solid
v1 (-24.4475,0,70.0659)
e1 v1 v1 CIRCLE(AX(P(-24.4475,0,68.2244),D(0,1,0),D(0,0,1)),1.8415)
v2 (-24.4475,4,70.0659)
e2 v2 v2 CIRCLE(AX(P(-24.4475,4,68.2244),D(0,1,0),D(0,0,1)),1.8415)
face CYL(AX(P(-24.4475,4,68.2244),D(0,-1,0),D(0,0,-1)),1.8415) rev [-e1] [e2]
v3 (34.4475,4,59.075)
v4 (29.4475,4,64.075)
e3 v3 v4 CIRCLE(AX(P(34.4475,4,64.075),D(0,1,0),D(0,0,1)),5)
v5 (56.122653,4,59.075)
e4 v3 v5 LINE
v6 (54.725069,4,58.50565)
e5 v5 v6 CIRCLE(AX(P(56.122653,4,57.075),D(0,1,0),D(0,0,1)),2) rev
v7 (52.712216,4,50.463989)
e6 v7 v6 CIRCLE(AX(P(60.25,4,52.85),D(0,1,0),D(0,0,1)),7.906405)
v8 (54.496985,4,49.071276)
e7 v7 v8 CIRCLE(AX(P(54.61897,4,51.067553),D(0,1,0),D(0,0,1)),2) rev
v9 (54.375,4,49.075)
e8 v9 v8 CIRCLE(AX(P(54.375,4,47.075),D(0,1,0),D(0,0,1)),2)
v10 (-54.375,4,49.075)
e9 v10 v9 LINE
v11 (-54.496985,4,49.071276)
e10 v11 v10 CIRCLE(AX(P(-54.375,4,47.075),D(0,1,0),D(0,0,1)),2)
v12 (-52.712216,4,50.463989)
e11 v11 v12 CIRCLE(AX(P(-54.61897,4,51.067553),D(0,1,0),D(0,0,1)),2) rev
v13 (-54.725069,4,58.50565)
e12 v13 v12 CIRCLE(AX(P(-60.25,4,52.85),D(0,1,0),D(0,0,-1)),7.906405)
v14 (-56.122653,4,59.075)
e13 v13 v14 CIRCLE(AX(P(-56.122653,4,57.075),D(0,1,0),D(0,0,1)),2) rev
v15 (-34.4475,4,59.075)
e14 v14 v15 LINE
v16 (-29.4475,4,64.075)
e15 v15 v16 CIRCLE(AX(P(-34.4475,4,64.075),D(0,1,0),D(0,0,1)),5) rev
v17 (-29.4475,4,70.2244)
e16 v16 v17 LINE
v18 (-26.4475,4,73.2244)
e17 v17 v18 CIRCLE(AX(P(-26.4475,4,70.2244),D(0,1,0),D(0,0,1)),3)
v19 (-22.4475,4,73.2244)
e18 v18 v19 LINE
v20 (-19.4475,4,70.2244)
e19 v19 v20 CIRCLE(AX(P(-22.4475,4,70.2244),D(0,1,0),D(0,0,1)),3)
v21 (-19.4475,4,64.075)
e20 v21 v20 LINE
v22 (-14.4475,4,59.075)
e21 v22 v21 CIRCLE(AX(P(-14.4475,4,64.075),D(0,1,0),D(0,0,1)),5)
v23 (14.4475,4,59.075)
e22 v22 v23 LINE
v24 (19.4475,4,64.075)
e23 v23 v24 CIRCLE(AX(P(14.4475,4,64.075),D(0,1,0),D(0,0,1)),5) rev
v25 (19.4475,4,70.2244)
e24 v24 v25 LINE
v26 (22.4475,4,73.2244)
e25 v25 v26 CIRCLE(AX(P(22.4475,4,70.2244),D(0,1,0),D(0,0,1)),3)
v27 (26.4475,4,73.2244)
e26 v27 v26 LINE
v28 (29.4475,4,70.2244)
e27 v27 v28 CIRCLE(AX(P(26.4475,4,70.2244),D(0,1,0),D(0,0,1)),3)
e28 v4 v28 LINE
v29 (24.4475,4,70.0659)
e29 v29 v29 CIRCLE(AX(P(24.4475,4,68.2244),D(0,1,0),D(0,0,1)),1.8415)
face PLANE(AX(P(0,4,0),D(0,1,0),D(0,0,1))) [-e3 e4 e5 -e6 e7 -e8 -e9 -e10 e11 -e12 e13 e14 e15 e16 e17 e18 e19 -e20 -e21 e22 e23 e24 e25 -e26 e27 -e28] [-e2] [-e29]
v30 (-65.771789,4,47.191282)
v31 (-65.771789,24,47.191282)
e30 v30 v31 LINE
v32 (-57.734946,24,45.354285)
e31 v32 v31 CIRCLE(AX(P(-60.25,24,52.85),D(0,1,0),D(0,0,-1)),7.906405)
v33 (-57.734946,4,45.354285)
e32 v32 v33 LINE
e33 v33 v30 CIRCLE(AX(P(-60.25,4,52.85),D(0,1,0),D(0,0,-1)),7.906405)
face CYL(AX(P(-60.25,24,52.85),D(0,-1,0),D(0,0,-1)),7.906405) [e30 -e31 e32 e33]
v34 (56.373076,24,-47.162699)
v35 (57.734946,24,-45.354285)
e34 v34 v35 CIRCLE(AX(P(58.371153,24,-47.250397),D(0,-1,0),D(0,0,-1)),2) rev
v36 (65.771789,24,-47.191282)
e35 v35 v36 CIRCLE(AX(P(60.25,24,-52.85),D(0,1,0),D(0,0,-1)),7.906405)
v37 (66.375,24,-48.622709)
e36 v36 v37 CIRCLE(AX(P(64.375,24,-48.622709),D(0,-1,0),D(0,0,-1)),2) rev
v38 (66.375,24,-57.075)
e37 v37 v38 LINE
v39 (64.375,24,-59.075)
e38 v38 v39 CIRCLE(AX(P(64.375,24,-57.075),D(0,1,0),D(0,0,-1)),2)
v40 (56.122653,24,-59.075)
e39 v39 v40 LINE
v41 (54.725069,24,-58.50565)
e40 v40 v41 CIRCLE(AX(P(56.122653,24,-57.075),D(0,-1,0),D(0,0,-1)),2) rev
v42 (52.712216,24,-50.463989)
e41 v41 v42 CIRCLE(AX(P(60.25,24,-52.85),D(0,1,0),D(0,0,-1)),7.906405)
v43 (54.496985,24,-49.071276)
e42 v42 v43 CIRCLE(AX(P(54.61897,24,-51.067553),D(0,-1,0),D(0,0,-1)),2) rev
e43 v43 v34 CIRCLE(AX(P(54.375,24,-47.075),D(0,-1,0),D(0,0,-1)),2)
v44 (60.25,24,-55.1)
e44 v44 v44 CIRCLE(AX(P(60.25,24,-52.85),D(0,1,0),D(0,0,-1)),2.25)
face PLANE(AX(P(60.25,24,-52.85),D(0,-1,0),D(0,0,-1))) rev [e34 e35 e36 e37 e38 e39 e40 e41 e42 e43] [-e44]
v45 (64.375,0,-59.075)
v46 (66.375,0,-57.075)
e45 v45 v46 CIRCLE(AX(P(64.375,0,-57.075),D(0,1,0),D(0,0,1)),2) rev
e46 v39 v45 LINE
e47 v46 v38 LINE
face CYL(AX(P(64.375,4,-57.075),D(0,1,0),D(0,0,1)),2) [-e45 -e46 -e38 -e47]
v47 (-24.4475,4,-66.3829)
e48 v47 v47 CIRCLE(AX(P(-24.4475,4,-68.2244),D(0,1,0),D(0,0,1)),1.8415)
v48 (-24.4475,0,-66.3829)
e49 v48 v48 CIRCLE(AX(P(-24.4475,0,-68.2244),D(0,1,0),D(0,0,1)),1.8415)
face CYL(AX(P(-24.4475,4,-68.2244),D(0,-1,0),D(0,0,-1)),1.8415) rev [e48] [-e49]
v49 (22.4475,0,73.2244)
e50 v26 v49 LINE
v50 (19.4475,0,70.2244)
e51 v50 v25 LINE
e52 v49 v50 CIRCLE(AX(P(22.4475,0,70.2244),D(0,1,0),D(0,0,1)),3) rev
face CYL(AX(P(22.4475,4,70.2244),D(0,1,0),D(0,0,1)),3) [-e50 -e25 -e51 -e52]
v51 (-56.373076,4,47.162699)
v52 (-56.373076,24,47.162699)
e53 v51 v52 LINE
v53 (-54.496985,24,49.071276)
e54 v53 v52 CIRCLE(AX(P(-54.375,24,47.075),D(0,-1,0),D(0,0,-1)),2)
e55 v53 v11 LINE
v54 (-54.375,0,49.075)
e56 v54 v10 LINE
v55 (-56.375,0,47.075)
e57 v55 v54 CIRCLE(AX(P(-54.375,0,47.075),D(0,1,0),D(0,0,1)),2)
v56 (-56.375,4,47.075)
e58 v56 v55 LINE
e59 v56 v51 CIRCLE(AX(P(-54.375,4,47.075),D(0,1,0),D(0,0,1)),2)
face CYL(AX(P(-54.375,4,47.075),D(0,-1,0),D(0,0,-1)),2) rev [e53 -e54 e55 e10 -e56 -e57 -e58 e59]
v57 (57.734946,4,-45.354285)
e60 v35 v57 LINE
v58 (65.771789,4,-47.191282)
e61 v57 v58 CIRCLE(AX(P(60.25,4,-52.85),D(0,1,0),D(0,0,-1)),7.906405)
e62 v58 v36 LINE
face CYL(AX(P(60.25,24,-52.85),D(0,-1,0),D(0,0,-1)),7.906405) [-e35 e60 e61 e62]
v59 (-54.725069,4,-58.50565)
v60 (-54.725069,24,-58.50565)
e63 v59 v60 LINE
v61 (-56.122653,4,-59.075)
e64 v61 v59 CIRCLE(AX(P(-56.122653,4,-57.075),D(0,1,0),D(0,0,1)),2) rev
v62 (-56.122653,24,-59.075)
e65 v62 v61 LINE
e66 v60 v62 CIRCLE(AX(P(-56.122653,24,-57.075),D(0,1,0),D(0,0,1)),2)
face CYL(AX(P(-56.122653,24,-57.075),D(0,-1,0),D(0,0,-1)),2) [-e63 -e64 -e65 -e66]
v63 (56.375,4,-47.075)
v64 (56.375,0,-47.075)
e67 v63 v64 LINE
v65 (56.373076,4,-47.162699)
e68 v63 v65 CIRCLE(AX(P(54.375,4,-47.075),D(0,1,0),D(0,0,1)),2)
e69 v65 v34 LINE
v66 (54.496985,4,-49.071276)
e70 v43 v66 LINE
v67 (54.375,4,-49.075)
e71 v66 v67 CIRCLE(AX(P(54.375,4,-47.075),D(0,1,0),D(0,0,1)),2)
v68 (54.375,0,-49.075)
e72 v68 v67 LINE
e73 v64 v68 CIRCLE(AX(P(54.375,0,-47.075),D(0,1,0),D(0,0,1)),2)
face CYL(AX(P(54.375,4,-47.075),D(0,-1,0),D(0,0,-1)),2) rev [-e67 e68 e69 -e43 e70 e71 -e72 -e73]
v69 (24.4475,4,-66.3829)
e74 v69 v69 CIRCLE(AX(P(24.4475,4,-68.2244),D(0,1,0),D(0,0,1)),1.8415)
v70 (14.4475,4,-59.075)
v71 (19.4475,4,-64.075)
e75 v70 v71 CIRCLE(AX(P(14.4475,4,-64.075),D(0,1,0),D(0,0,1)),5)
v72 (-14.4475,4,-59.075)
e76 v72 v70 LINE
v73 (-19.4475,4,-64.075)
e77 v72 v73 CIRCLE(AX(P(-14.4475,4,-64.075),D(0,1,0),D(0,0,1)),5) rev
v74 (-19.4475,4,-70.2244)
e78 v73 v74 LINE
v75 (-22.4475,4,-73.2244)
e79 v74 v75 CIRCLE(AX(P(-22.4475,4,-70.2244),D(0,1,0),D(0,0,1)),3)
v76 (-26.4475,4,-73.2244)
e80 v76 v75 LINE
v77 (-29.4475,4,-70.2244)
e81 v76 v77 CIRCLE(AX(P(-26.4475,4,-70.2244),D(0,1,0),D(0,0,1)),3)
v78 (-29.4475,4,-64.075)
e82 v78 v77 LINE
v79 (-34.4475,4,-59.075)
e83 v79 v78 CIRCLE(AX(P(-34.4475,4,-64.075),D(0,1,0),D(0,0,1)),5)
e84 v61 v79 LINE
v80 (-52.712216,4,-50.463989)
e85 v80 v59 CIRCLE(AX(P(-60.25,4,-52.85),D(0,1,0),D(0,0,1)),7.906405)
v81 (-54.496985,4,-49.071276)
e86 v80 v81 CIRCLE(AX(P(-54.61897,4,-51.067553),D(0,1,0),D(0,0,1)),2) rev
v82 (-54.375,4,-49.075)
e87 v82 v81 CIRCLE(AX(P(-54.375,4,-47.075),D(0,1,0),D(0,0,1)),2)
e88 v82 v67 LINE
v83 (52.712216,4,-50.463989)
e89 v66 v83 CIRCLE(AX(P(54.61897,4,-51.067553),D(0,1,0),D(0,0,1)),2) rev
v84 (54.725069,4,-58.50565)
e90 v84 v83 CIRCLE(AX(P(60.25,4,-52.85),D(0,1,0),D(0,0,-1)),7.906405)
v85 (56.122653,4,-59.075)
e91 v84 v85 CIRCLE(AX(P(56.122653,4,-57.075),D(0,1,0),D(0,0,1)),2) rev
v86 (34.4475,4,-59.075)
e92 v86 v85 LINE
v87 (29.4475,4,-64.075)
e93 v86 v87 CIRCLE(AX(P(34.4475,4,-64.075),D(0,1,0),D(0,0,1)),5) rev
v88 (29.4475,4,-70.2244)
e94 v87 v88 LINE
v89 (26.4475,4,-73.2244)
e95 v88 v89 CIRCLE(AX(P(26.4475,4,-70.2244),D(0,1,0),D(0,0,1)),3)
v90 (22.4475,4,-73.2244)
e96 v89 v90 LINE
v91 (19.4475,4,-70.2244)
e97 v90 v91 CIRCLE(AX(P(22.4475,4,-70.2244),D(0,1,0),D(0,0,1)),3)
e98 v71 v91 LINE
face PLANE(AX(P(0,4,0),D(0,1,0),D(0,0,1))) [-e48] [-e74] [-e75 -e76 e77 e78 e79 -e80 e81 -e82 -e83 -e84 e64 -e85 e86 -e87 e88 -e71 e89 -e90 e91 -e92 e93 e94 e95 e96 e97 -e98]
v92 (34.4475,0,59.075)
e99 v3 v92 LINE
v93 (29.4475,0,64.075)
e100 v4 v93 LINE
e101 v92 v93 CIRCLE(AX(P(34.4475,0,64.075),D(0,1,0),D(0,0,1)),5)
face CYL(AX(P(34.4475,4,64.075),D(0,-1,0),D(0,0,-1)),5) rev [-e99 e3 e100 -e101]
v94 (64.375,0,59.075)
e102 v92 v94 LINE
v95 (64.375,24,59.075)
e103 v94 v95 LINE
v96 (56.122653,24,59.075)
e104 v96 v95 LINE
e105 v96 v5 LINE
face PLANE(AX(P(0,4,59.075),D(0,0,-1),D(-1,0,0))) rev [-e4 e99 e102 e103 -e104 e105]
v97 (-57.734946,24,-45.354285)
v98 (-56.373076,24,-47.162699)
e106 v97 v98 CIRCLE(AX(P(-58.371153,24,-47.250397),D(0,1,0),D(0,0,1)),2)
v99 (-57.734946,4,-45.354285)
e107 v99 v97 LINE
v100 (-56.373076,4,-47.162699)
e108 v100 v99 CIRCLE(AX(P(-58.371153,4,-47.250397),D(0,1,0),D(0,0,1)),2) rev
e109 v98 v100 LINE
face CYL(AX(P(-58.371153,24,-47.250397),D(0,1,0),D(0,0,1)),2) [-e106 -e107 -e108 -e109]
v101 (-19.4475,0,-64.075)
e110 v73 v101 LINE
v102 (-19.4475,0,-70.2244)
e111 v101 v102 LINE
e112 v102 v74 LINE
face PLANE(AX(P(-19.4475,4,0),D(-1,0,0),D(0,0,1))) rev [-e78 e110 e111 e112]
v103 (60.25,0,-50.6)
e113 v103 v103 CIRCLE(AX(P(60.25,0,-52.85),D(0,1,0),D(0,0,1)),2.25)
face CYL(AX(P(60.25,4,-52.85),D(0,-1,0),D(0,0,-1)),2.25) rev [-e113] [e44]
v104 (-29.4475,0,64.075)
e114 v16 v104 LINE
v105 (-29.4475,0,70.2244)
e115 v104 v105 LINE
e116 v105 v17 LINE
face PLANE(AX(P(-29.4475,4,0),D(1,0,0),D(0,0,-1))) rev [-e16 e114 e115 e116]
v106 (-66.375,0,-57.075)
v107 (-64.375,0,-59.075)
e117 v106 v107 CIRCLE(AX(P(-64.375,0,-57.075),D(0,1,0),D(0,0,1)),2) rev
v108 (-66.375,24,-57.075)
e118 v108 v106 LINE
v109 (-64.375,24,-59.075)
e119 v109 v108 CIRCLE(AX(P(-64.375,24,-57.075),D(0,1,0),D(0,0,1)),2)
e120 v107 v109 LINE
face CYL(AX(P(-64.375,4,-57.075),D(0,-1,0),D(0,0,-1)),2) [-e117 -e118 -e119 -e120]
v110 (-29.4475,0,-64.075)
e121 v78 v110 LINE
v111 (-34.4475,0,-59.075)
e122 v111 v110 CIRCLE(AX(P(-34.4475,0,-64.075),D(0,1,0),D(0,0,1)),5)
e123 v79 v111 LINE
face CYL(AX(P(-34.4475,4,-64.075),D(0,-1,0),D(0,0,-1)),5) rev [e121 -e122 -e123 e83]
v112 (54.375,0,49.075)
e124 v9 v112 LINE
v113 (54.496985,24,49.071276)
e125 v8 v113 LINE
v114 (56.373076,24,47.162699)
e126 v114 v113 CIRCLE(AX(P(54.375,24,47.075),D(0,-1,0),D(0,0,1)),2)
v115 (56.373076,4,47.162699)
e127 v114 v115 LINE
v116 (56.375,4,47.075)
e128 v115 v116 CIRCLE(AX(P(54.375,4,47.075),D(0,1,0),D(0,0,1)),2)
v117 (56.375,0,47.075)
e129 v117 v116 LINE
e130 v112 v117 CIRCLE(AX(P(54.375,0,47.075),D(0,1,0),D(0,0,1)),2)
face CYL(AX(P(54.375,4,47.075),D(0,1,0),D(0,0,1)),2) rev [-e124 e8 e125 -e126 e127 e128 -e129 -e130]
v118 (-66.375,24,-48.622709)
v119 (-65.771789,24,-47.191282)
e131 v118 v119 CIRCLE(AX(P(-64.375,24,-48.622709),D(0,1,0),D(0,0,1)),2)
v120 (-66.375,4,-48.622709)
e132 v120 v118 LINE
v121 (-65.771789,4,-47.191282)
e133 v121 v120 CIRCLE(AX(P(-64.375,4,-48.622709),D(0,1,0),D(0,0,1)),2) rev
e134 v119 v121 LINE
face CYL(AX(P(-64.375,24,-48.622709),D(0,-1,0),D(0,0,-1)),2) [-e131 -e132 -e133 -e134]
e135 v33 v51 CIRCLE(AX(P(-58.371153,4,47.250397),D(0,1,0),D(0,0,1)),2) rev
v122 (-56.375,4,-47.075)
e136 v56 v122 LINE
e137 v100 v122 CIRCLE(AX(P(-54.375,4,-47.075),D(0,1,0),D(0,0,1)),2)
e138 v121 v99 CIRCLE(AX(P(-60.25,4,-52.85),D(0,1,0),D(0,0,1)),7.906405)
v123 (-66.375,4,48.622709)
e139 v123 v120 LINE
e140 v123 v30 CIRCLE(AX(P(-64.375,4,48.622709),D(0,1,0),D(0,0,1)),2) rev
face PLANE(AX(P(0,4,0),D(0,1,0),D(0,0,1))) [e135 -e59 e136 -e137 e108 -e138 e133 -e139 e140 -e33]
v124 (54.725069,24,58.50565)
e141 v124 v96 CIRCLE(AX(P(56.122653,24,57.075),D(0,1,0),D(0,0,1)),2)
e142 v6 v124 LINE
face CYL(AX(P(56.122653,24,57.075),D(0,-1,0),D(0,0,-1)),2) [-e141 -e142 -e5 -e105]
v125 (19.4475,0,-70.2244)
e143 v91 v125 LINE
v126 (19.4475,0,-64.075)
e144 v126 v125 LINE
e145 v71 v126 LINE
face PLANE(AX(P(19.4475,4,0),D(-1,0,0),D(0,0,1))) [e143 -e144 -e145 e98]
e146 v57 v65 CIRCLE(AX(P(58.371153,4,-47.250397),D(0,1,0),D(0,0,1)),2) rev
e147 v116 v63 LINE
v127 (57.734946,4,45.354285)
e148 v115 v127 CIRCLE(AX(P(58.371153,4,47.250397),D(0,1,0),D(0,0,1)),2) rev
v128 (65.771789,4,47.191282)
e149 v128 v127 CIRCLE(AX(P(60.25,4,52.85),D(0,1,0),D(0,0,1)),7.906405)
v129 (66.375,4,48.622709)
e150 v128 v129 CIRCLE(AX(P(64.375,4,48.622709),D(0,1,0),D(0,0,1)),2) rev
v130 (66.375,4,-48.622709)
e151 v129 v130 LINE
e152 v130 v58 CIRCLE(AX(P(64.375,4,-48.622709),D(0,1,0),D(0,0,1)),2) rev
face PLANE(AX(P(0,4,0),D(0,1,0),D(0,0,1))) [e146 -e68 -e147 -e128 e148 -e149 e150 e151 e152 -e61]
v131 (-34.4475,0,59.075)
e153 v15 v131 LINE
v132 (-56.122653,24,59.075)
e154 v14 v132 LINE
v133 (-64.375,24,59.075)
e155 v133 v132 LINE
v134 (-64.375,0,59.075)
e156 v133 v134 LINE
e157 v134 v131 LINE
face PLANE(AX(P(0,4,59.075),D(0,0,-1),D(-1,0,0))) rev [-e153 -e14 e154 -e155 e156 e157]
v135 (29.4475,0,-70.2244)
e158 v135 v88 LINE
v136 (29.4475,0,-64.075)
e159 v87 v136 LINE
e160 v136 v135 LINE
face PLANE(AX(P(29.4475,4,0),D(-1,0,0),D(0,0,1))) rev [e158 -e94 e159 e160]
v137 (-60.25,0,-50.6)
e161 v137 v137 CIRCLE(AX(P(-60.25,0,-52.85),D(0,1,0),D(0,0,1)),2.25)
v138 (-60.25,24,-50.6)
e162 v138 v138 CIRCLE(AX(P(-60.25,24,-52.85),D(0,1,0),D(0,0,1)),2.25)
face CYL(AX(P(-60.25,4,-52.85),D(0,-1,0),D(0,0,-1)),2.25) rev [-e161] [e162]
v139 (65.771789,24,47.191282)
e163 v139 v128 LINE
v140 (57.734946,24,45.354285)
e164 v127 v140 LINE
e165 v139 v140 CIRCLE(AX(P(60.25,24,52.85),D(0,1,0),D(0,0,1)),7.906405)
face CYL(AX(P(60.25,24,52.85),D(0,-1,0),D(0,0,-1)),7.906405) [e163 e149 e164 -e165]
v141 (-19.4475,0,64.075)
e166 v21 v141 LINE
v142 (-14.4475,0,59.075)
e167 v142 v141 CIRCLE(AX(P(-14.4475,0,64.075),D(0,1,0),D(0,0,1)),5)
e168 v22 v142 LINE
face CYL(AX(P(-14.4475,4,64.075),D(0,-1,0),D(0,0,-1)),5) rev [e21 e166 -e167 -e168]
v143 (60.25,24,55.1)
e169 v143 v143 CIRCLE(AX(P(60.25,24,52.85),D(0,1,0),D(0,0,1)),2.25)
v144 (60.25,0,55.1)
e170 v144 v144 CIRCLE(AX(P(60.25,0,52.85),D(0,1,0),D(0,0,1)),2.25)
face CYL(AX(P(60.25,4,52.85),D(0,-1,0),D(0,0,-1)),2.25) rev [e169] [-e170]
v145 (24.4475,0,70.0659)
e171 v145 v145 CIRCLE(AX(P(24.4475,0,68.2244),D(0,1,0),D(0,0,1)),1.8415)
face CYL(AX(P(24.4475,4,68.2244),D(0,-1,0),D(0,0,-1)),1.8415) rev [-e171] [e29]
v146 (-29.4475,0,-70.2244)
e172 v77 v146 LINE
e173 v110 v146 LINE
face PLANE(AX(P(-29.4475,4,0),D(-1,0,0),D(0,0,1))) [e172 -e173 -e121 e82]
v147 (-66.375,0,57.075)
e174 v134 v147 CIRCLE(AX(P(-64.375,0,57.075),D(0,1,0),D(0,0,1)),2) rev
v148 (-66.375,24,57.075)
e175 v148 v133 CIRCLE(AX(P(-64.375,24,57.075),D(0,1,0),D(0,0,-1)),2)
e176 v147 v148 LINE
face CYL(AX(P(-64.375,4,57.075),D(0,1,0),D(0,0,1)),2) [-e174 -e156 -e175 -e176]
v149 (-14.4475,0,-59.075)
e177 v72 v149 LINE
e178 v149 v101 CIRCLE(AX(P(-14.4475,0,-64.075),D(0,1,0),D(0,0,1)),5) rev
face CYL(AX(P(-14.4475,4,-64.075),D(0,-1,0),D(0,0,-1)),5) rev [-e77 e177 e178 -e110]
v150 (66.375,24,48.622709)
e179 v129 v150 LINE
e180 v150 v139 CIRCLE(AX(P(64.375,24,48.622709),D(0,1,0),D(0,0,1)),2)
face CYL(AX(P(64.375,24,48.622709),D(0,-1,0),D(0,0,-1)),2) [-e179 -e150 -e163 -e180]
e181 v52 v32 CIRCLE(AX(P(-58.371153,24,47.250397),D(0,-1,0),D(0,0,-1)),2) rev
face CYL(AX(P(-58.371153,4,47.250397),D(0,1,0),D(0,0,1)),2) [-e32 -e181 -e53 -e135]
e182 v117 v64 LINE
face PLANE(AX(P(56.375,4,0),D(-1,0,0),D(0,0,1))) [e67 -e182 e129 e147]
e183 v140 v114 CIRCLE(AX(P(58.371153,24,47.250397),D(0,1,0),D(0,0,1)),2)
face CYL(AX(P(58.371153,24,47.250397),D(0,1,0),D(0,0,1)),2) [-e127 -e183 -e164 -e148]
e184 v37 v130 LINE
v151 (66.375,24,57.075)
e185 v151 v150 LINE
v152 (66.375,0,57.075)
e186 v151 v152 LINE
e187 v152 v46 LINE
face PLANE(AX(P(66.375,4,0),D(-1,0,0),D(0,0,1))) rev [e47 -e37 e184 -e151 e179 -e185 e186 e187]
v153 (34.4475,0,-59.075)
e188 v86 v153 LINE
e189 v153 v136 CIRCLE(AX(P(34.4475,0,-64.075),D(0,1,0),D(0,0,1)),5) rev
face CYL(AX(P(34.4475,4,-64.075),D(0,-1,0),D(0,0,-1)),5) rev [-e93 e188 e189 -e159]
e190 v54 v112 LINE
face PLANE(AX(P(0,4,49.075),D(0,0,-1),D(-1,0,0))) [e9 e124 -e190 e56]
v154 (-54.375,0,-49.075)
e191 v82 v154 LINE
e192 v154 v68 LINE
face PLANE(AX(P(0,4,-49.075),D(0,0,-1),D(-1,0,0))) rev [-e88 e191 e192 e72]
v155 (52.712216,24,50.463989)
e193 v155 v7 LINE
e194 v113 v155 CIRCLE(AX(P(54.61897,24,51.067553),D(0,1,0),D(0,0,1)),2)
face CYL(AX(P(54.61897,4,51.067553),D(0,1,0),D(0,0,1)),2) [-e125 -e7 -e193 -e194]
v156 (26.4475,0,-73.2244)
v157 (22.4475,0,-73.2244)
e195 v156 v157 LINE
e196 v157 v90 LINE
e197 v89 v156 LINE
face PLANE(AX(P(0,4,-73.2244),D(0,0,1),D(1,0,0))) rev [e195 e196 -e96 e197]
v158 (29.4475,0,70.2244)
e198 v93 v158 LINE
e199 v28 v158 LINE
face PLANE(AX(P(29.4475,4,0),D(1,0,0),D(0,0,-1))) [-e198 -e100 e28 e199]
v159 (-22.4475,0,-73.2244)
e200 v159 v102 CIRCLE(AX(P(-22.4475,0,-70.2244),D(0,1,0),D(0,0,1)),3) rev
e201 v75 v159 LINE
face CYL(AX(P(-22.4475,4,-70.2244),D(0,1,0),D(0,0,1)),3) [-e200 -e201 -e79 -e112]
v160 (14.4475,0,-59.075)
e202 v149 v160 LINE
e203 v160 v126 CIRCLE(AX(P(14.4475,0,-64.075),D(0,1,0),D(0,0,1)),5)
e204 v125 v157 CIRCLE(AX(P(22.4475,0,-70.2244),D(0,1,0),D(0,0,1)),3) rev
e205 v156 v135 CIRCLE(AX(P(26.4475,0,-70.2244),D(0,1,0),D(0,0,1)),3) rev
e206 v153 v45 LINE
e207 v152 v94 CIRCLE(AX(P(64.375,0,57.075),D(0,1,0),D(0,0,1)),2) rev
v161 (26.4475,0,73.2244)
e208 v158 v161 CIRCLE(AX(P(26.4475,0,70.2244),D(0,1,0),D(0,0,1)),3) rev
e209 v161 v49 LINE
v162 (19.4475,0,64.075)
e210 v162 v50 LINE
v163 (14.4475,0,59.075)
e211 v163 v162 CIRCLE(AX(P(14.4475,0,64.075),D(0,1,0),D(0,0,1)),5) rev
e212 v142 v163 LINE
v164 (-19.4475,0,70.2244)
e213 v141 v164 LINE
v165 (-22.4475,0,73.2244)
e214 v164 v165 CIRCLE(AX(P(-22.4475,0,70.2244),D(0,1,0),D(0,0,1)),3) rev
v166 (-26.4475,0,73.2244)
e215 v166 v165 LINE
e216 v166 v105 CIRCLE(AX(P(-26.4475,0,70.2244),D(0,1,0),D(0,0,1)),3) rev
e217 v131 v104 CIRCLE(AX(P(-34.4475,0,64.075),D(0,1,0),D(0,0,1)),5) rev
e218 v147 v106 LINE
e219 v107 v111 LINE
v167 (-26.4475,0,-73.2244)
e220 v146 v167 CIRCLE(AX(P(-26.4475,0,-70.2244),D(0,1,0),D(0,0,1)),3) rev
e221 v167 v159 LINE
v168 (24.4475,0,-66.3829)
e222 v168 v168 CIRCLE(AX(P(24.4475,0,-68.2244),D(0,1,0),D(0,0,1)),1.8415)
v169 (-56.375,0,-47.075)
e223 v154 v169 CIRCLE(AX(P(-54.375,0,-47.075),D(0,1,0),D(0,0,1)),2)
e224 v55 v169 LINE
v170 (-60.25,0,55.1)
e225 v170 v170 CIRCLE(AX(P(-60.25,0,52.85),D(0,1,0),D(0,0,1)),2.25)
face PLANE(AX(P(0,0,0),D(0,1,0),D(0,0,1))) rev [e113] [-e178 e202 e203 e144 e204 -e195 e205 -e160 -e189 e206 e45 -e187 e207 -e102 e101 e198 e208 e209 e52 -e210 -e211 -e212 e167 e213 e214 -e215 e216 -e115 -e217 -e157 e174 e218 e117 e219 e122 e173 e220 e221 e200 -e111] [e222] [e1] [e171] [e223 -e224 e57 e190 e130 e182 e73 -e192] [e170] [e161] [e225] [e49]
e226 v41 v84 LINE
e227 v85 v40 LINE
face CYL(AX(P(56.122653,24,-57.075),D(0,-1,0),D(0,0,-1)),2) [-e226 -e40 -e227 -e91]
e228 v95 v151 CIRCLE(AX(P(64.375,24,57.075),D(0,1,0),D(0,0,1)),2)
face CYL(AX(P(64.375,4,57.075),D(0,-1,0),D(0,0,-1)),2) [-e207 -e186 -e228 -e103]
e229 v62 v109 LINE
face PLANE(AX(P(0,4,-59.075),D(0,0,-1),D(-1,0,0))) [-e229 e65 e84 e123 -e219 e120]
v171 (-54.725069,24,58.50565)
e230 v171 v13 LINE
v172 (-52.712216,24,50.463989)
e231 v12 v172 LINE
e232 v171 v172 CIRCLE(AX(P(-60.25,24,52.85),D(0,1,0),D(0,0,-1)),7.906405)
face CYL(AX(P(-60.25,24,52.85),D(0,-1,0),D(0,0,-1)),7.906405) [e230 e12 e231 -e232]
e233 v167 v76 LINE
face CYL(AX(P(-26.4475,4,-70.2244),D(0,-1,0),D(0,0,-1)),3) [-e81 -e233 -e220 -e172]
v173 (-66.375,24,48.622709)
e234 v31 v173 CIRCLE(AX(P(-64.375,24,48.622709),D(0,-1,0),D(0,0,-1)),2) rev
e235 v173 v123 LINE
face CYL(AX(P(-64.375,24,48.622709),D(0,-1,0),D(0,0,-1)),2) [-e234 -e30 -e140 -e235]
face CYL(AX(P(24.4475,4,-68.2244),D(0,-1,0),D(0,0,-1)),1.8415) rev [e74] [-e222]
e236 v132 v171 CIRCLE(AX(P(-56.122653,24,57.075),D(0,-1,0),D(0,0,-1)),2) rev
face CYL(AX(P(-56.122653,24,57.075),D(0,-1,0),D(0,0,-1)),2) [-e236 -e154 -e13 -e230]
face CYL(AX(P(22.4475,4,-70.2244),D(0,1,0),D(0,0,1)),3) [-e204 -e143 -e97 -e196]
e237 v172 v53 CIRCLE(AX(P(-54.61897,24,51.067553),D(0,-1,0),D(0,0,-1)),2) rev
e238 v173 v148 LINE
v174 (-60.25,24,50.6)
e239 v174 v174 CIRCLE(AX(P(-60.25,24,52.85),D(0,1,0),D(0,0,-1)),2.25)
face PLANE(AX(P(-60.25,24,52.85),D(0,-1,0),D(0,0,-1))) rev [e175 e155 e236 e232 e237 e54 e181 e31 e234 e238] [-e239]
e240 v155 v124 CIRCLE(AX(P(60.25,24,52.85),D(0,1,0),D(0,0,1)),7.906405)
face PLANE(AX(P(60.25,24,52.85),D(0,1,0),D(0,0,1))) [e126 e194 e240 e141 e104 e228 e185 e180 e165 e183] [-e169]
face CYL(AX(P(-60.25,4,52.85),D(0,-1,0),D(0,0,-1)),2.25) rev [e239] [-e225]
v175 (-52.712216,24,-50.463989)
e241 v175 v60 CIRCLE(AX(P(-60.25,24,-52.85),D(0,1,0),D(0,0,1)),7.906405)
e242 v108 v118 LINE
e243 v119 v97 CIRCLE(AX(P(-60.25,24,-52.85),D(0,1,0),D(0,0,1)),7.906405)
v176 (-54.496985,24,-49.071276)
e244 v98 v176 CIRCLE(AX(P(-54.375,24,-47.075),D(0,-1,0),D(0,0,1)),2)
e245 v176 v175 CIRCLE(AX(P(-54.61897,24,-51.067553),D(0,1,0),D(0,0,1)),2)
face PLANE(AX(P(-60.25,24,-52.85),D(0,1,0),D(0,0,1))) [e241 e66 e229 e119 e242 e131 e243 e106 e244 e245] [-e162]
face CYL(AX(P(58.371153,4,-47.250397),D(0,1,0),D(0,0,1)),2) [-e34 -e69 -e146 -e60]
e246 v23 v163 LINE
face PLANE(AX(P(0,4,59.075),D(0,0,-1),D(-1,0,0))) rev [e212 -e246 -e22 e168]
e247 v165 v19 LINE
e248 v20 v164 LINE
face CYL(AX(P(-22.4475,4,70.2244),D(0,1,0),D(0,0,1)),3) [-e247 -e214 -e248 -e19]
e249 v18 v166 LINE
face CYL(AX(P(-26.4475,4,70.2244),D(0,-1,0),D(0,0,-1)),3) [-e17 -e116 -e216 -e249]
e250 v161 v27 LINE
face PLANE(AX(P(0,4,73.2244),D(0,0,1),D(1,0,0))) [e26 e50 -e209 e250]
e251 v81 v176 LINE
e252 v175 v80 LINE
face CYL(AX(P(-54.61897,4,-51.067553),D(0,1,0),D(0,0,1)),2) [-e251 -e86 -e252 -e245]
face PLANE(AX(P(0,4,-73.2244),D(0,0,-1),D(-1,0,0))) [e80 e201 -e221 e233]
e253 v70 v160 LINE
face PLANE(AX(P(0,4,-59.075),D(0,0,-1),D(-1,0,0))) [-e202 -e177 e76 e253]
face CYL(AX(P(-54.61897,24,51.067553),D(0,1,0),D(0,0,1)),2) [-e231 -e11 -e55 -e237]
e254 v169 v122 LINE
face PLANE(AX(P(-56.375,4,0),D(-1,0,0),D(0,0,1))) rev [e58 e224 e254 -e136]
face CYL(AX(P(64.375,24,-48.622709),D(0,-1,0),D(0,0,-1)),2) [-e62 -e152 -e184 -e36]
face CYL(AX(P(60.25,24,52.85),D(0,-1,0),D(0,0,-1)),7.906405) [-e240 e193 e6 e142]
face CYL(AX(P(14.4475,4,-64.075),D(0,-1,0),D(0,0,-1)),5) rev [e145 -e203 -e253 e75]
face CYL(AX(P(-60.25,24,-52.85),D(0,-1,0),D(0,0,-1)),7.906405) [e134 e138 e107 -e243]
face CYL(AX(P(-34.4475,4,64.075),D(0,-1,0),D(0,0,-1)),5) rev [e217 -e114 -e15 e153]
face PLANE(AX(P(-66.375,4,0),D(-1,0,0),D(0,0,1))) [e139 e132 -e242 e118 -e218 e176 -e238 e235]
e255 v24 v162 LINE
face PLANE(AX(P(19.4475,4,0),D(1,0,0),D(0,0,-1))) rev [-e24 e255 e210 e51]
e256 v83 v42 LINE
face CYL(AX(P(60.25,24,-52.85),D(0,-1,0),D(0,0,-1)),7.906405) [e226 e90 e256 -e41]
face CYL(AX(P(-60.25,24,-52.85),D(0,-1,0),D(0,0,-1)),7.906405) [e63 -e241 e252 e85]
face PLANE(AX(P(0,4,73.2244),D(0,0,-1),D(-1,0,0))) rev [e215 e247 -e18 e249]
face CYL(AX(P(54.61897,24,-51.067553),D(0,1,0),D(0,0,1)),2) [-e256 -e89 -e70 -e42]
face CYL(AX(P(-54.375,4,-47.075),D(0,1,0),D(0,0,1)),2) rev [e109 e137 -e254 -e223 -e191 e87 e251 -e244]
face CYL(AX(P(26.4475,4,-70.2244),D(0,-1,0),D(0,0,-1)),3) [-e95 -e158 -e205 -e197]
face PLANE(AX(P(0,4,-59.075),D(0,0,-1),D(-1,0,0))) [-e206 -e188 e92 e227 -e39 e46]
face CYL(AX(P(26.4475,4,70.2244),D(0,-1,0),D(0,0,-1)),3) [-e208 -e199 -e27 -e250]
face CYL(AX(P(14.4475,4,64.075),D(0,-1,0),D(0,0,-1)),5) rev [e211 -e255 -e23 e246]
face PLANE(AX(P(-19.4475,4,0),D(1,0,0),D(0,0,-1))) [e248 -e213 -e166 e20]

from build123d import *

# Parameters (mm, degrees)
SKETCH1_R           = 1.8415
SKETCH1_W           = 132.75
SKETCH1_H           = 118.15
SKETCH1_R_2         = 2.25
SKETCH1_W_2         = 112.75
SKETCH1_H_2         = 98.15
BOSS_EXTRUDE3_DEPTH = 4
FILLET1_R           = 2
FILLET2_R           = 3
BOSS_EXTRUDE5_START = 20
SKETCH3_R           = 2.25
BOSS_EXTRUDE5_DEPTH = 20
FILLET3_R           = 2


with BuildPart() as part:
    # Sketch1 → Boss-Extrude3 (new body)
    # profile 1 of 13: a face of its own
    with BuildSketch(Plane(origin=(0, 0, 0), x_dir=(1, 0, 0), z_dir=(0, 1, 0))):
        Polygon((-29.4475, 64.075), (-29.4475, 59.075), (-19.4475, 59.075), (-19.4475, 64.075), (-19.4475, 73.2244), (-29.4475, 73.2244), align=None)
        with Locations(Location((-24.4475, 68.2244, 0), (0, 0, 270))):
            Circle(SKETCH1_R, mode=Mode.SUBTRACT)
    # profile 2 of 13: a face of its own
    with BuildSketch(Plane(origin=(0, 0, 0), x_dir=(1, 0, 0), z_dir=(0, 1, 0))):
        Polygon((19.4475, 64.075), (19.4475, 59.075), (29.4475, 59.075), (29.4475, 64.075), (29.4475, 73.2244), (19.4475, 73.2244), align=None)
        with Locations(Location((24.4475, 68.2244, 0), (0, 0, 270))):
            Circle(SKETCH1_R, mode=Mode.SUBTRACT)
    # profile 3 of 13: a face of its own
    with BuildSketch(Plane(origin=(0, 0, 0), x_dir=(1, 0, 0), z_dir=(0, 1, 0))):
        Rectangle(SKETCH1_W, SKETCH1_H)
        with Locations(Location((60.25, -52.85, 0), (0, 0, 270))):
            Circle(SKETCH1_R_2, mode=Mode.SUBTRACT)
        with Locations(Location((-60.25, -52.85, 0), (0, 0, 270))):
            Circle(SKETCH1_R_2, mode=Mode.SUBTRACT)
        with Locations(Location((60.25, 52.85, 0), (0, 0, 270))):
            Circle(SKETCH1_R_2, mode=Mode.SUBTRACT)
        with Locations(Location((-60.25, 52.85, 0), (0, 0, 270))):
            Circle(SKETCH1_R_2, mode=Mode.SUBTRACT)
        Rectangle(SKETCH1_W_2, SKETCH1_H_2, mode=Mode.SUBTRACT)
    # profile 4 of 13: a face of its own
    with BuildSketch(Plane(origin=(0, 0, 0), x_dir=(1, 0, 0), z_dir=(0, 1, 0))):
        Polygon((-19.4475, -59.075), (-29.4475, -59.075), (-29.4475, -64.075), (-29.4475, -73.2244), (-19.4475, -73.2244), (-19.4475, -64.075), align=None)
        with Locations(Location((-24.4475, -68.2244, 0), (0, 0, 270))):
            Circle(SKETCH1_R, mode=Mode.SUBTRACT)
    # profile 5 of 13: a face of its own
    with BuildSketch(Plane(origin=(0, 0, 0), x_dir=(1, 0, 0), z_dir=(0, 1, 0))):
        Polygon((29.4475, -59.075), (19.4475, -59.075), (19.4475, -64.075), (19.4475, -73.2244), (29.4475, -73.2244), (29.4475, -64.075), align=None)
        with Locations(Location((24.4475, -68.2244, 0), (0, 0, 270))):
            Circle(SKETCH1_R, mode=Mode.SUBTRACT)
    # profile 6 of 13: a face of its own
    with BuildSketch(Plane(origin=(0, 0, 0), x_dir=(1, 0, 0), z_dir=(0, 1, 0))):
        with BuildLine():
            ThreePointArc((19.4475, 64.075), (17.983033906, 60.539466094), (14.4475, 59.075))
            Line((14.4475, 59.075), (19.4475, 59.075))
            Line((19.4475, 59.075), (19.4475, 64.075))
        make_face()
    # profile 7 of 13: a face of its own
    with BuildSketch(Plane(origin=(0, 0, 0), x_dir=(1, 0, 0), z_dir=(0, 1, 0))):
        with BuildLine():
            Line((29.4475, 64.075), (29.4475, 59.075))
            Line((29.4475, 59.075), (34.4475, 59.075))
            ThreePointArc((34.4475, 59.075), (30.911966094, 60.539466094), (29.4475, 64.075))
        make_face()
    # profile 8 of 13: a face of its own
    with BuildSketch(Plane(origin=(0, 0, 0), x_dir=(1, 0, 0), z_dir=(0, 1, 0))):
        with BuildLine():
            ThreePointArc((-29.4475, 64.075), (-30.911966094, 60.539466094), (-34.4475, 59.075))
            Line((-34.4475, 59.075), (-29.4475, 59.075))
            Line((-29.4475, 59.075), (-29.4475, 64.075))
        make_face()
    # profile 9 of 13: a face of its own
    with BuildSketch(Plane(origin=(0, 0, 0), x_dir=(1, 0, 0), z_dir=(0, 1, 0))):
        with BuildLine():
            Line((-19.4475, 64.075), (-19.4475, 59.075))
            Line((-19.4475, 59.075), (-14.4475, 59.075))
            ThreePointArc((-14.4475, 59.075), (-17.983033906, 60.539466094), (-19.4475, 64.075))
        make_face()
    # profile 10 of 13: a face of its own
    with BuildSketch(Plane(origin=(0, 0, 0), x_dir=(1, 0, 0), z_dir=(0, 1, 0))):
        with BuildLine():
            Line((-14.4475, -59.075), (-19.4475, -59.075))
            Line((-19.4475, -59.075), (-19.4475, -64.075))
            ThreePointArc((-19.4475, -64.075), (-17.983033906, -60.539466094), (-14.4475, -59.075))
        make_face()
    # profile 11 of 13: a face of its own
    with BuildSketch(Plane(origin=(0, 0, 0), x_dir=(1, 0, 0), z_dir=(0, 1, 0))):
        with BuildLine():
            Line((-29.4475, -59.075), (-34.4475, -59.075))
            ThreePointArc((-34.4475, -59.075), (-30.911966094, -60.539466094), (-29.4475, -64.075))
            Line((-29.4475, -64.075), (-29.4475, -59.075))
        make_face()
    # profile 12 of 13: a face of its own
    with BuildSketch(Plane(origin=(0, 0, 0), x_dir=(1, 0, 0), z_dir=(0, 1, 0))):
        with BuildLine():
            Line((19.4475, -59.075), (14.4475, -59.075))
            ThreePointArc((14.4475, -59.075), (17.983033906, -60.539466094), (19.4475, -64.075))
            Line((19.4475, -64.075), (19.4475, -59.075))
        make_face()
    # profile 13 of 13: a face of its own
    with BuildSketch(Plane(origin=(0, 0, 0), x_dir=(1, 0, 0), z_dir=(0, 1, 0))):
        with BuildLine():
            Line((34.4475, -59.075), (29.4475, -59.075))
            Line((29.4475, -59.075), (29.4475, -64.075))
            ThreePointArc((29.4475, -64.075), (30.911966094, -60.539466094), (34.4475, -59.075))
        make_face()
    extrude(amount=BOSS_EXTRUDE3_DEPTH)

    # Fillet1
    fillet1_edges = [part.edges().sort_by_distance(p)[0] for p in [
        (56.375, 2, -49.075),
        (-56.375, 2, -49.075),
        (-56.375, 2, 49.075),
        (56.375, 2, 49.075),
        (-66.375, 2, 59.075),
        (-66.375, 2, -59.075),
        (66.375, 2, -59.075),
        (66.375, 2, 59.075),
    ]]
    fillet(fillet1_edges, radius=FILLET1_R)

    # Fillet2
    fillet2_edges = [part.edges().sort_by_distance(p)[0] for p in [
        (29.4475, 2, 73.2244),
        (19.4475, 2, 73.2244),
        (-19.4475, 2, 73.2244),
        (-29.4475, 2, 73.2244),
        (-29.4475, 2, -73.2244),
        (-19.4475, 2, -73.2244),
        (19.4475, 2, -73.2244),
        (29.4475, 2, -73.2244),
    ]]
    fillet(fillet2_edges, radius=FILLET2_R)

    # Sketch3 → Boss-Extrude5 (add)
    # profile 1 of 4: a face of its own
    with BuildSketch(Plane(origin=(0, 4, 0), x_dir=(1, 0, 0), z_dir=(0, 1, 0)).offset(BOSS_EXTRUDE5_START)):
        with BuildLine():
            Line((-66.375, 47.850438753), (-66.375, 57.075))
            ThreePointArc((-66.375, 57.075), (-65.789213562, 58.489213562), (-64.375, 59.075))
            Line((-64.375, 59.075), (-55.375514113, 59.075))
            ThreePointArc((-55.375514113, 59.075), (-52.508114014, 54.454505857), (-53.303014131, 49.075))
            Line((-53.303014131, 49.075), (-54.375, 49.075))
            ThreePointArc((-54.375, 49.075), (-55.789213562, 48.489213562), (-56.375, 47.075))
            Line((-56.375, 47.075), (-56.375, 45.958293922))
            ThreePointArc((-56.375, 45.958293922), (-61.719924493, 45.081437736), (-66.375, 47.850438753))
        make_face()
        with Locations(Location((-60.25, 52.85, 0), (0, 0, 270))):
            Circle(SKETCH3_R, mode=Mode.SUBTRACT)
    # profile 2 of 4: a face of its own
    with BuildSketch(Plane(origin=(0, 4, 0), x_dir=(1, 0, 0), z_dir=(0, 1, 0)).offset(BOSS_EXTRUDE5_START)):
        with BuildLine():
            Line((56.375, 47.075), (56.375, 45.958293922))
            ThreePointArc((56.375, 45.958293922), (61.719924493, 45.081437736), (66.375, 47.850438753))
            Line((66.375, 47.850438753), (66.375, 57.075))
            ThreePointArc((66.375, 57.075), (65.789213562, 58.489213562), (64.375, 59.075))
            Line((64.375, 59.075), (55.375514113, 59.075))
            ThreePointArc((55.375514113, 59.075), (52.508114014, 54.454505857), (53.303014131, 49.075))
            Line((53.303014131, 49.075), (54.375, 49.075))
            ThreePointArc((54.375, 49.075), (55.789213562, 48.489213562), (56.375, 47.075))
        make_face()
        with Locations(Location((60.25, 52.85, 0), (0, 0, 90))):
            Circle(SKETCH3_R, mode=Mode.SUBTRACT)
    # profile 3 of 4: a face of its own
    with BuildSketch(Plane(origin=(0, 4, 0), x_dir=(1, 0, 0), z_dir=(0, 1, 0)).offset(BOSS_EXTRUDE5_START)):
        with BuildLine():
            Line((66.375, -47.850438753), (66.375, -57.075))
            ThreePointArc((66.375, -57.075), (65.789213562, -58.489213562), (64.375, -59.075))
            Line((64.375, -59.075), (55.375514113, -59.075))
            ThreePointArc((55.375514113, -59.075), (52.508114014, -54.454505857), (53.303014131, -49.075))
            Line((53.303014131, -49.075), (54.375, -49.075))
            ThreePointArc((54.375, -49.075), (55.789213562, -48.489213562), (56.375, -47.075))
            Line((56.375, -47.075), (56.375, -45.958293922))
            ThreePointArc((56.375, -45.958293922), (61.719924493, -45.081437736), (66.375, -47.850438753))
        make_face()
        with Locations(Location((60.25, -52.85, 0), (0, 0, 270))):
            Circle(SKETCH3_R, mode=Mode.SUBTRACT)
    # profile 4 of 4: a face of its own
    with BuildSketch(Plane(origin=(0, 4, 0), x_dir=(1, 0, 0), z_dir=(0, 1, 0)).offset(BOSS_EXTRUDE5_START)):
        with BuildLine():
            Line((-56.375, -47.075), (-56.375, -45.958293922))
            ThreePointArc((-56.375, -45.958293922), (-61.719924493, -45.081437736), (-66.375, -47.850438753))
            Line((-66.375, -47.850438753), (-66.375, -57.075))
            ThreePointArc((-66.375, -57.075), (-65.789213562, -58.489213562), (-64.375, -59.075))
            Line((-64.375, -59.075), (-55.375514113, -59.075))
            ThreePointArc((-55.375514113, -59.075), (-52.508114014, -54.454505857), (-53.303014131, -49.075))
            Line((-53.303014131, -49.075), (-54.375, -49.075))
            ThreePointArc((-54.375, -49.075), (-55.789213562, -48.489213562), (-56.375, -47.075))
        make_face()
        with Locations(Location((-60.25, -52.85, 0), (0, 0, 90))):
            Circle(SKETCH3_R, mode=Mode.SUBTRACT)
    extrude(amount=-BOSS_EXTRUDE5_DEPTH)

    # Fillet3
    # the kernel refuses this fillet: 2 mm, written as the material it takes off along each edge
    with BuildSketch(Plane(origin=(-55.375514113, 26.161072157, 59.075), x_dir=(0.7524559247043358, 0, -0.6586426051944584), z_dir=(0, -1, 0)), Plane(origin=(55.375514113, 26.161072157, -59.075), x_dir=(-0.7524559247043358, 0, 0.6586426051944584), z_dir=(0, -1, 0))) as fillet3_piece_1:
        with BuildLine():
            CenterArc((0.755096128, -1.997009352), FILLET3_R, 86.866285745, 44.330146388)
            Line((-0.562189082, -0.492097503), (0, 0))
            ThreePointArc((0, 0), (0.432214431, 0.011822636), (0.864428863, 0))
        make_face()
    extrude(amount=22.161072157, mode=Mode.SUBTRACT)
    with BuildSketch(Plane(origin=(-53.303014131, 27.773536346, 49.075), x_dir=(-0.9999951371262895, 0, -0.003118609269165201), z_dir=(0, -1, 0))) as fillet3_piece_2:
        with BuildLine():
            CenterArc((1.309735319, -1.996647169), FILLET3_R, 93.318097492, 68.938549096)
            Line((-0.595126999, -1.38713954), (-0.78561323, -1.326188777))
            ThreePointArc((-0.78561323, -1.326188777), (-0.514540016, -0.600479941), (-0.175431931, 0.096039772))
            Line((-0.175431931, 0.096039772), (0.000623722, 0.199999027))
            ThreePointArc((0.000623722, 0.199999027), (1.072604378, 0.196655922), (1.182400725, 0.199664717))
            Line((1.182400725, 0.199664717), (1.193976597, 0))
        make_face()
    extrude(amount=23.773536346, mode=Mode.SUBTRACT)
    with BuildSketch(Plane(origin=(-56.375, 27.720113625, 45.958293922), x_dir=(-0.9139141920372147, 0, -0.4059074396866423), z_dir=(0, -1, 0)), Plane(origin=(56.375, 27.720113625, -45.958293922), x_dir=(0.9139141920372147, 0, 0.4059074396866423), z_dir=(0, -1, 0))) as fillet3_piece_3:
        with BuildLine():
            CenterArc((1.299837854, -1.991124783), FILLET3_R, 84.600259862, 68.938549096)
            Line((-0.490634918, -1.099941718), (-0.669682195, -1.010823412))
            ThreePointArc((-0.669682195, -1.010823412), (-0.636062143, -0.939392045), (-0.182782838, 0.081181488))
            Line((-0.182782838, 0.081181488), (-0.01882076, 0.199112478))
            ThreePointArc((-0.01882076, 0.199112478), (0.744022725, 0.23508553), (1.506866209, 0.199112478))
            Line((1.506866209, 0.199112478), (1.48804545, 0))
        make_face()
    extrude(amount=23.720113625, mode=Mode.SUBTRACT)
    with BuildSketch(Plane(origin=(-66.375, 26.233762317, 47.850438753), x_dir=(0.6751067692809941, 0, -0.7377200350207241), z_dir=(0, -1, 0)), Plane(origin=(66.375, 26.233762317, -47.850438753), x_dir=(-0.6751067692809941, 0, 0.7377200350207241), z_dir=(0, -1, 0))) as fillet3_piece_4:
        with BuildLine():
            CenterArc((0.780494659, 1.996804617), FILLET3_R, 227.537557999, 45.701672964)
            Line((-0.569718879, 0.521364547), (0, 0))
            ThreePointArc((0, 0), (0.446752463, -0.012631995), (0.893504927, 0))
        make_face()
    extrude(amount=22.233762317, mode=Mode.SUBTRACT)
    with BuildSketch(Plane(origin=(66.375, 26.233762317, 47.850438753), x_dir=(-0.6751067692809941, 0, -0.7377200350207241), z_dir=(0, -1, 0)), Plane(origin=(-66.375, 26.233762317, -47.850438753), x_dir=(0.6751067692809941, 0, 0.7377200350207241), z_dir=(0, -1, 0))) as fillet3_piece_5:
        with BuildLine():
            CenterArc((0.780494659, -1.996804617), FILLET3_R, 86.760769036, 45.701672964)
            Line((-0.569718879, -0.521364547), (0, 0))
            ThreePointArc((0, 0), (0.446752463, 0.012631995), (0.893504927, 0))
        make_face()
    extrude(amount=22.233762317, mode=Mode.SUBTRACT)
    with BuildSketch(Plane(origin=(53.303014131, 27.773536346, 49.075), x_dir=(-0.3914088166660056, 0, 0.9202168973867614), z_dir=(0, -1, 0))) as fillet3_piece_6:
        with BuildLine():
            CenterArc((1.318504186, -1.990867458), FILLET3_R, 84.522481445, 68.938549096)
            Line((-0.470757165, -1.097254668), (-0.6496833, -1.007893389))
            ThreePointArc((-0.6496833, -1.007893389), (-0.6036281, -0.908177747), (-0.184043379, 0.078281763))
            Line((-0.184043379, 0.078281763), (-0.019091035, 0.199086746))
            ThreePointArc((-0.019091035, 0.199086746), (0.754707269, 0.236102785), (1.528505574, 0.199086746))
            Line((1.528505574, 0.199086746), (1.509414538, 0))
        make_face()
    extrude(amount=23.773536346, mode=Mode.SUBTRACT)
    with BuildSketch(Plane(origin=(56.375, 27.720113625, 45.958293922), x_dir=(0.9139141920372147, 0, -0.4059074396866423), z_dir=(0, -1, 0)), Plane(origin=(-56.375, 27.720113625, -45.958293922), x_dir=(-0.9139141920372147, 0, 0.4059074396866423), z_dir=(0, -1, 0))) as fillet3_piece_7:
        with BuildLine():
            CenterArc((1.299837854, 1.991124783), FILLET3_R, 206.461191041, 68.938549096)
            Line((-0.490634918, 1.099941718), (-0.669682195, 1.010823412))
            ThreePointArc((-0.669682195, 1.010823412), (-0.636062143, 0.939392045), (-0.182782838, -0.081181488))
            Line((-0.182782838, -0.081181488), (-0.01882076, -0.199112478))
            ThreePointArc((-0.01882076, -0.199112478), (0.744022725, -0.23508553), (1.506866209, -0.199112478))
            Line((1.506866209, -0.199112478), (1.48804545, 0))
        make_face()
    extrude(amount=23.720113625, mode=Mode.SUBTRACT)
    with BuildSketch(Plane(origin=(55.375514113, 26.161072157, 59.075), x_dir=(-0.7524559247043358, 0, -0.6586426051944584), z_dir=(0, -1, 0)), Plane(origin=(-55.375514113, 26.161072157, -59.075), x_dir=(0.7524559247043358, 0, 0.6586426051944584), z_dir=(0, -1, 0))) as fillet3_piece_8:
        with BuildLine():
            CenterArc((0.755096128, 1.997009352), FILLET3_R, 228.803567867, 44.330146388)
            Line((-0.562189082, 0.492097503), (0, 0))
            ThreePointArc((0, 0), (0.432214431, -0.011822636), (0.864428863, 0))
        make_face()
    extrude(amount=22.161072157, mode=Mode.SUBTRACT)
    with BuildSketch(Plane(origin=(-53.303014131, 27.773536346, -49.075), x_dir=(-0.9999951371262895, 0, 0.003118609269165201), z_dir=(0, -1, 0))) as fillet3_piece_9:
        with BuildLine():
            CenterArc((1.309735319, 1.996647169), FILLET3_R, 197.743353412, 68.938549096)
            Line((-0.595126999, 1.38713954), (-0.78561323, 1.326188777))
            ThreePointArc((-0.78561323, 1.326188777), (-0.514540016, 0.600479941), (-0.175431931, -0.096039772))
            Line((-0.175431931, -0.096039772), (0.000623722, -0.199999027))
            ThreePointArc((0.000623722, -0.199999027), (1.072604378, -0.196655922), (1.182400725, -0.199664717))
            Line((1.182400725, -0.199664717), (1.193976597, 0))
        make_face()
    extrude(amount=23.773536346, mode=Mode.SUBTRACT)
    with BuildSketch(Plane(origin=(53.303014131, 27.773536346, -49.075), x_dir=(-0.3914088166660056, 0, -0.9202168973867614), z_dir=(0, -1, 0))) as fillet3_piece_10:
        with BuildLine():
            CenterArc((1.318504186, 1.990867458), FILLET3_R, 206.538969459, 68.938549096)
            Line((-0.470757165, 1.097254668), (-0.6496833, 1.007893389))
            ThreePointArc((-0.6496833, 1.007893389), (-0.6036281, 0.908177747), (-0.184043379, -0.078281763))
            Line((-0.184043379, -0.078281763), (-0.019091035, -0.199086746))
            ThreePointArc((-0.019091035, -0.199086746), (0.754707269, -0.236102785), (1.528505574, -0.199086746))
            Line((1.528505574, -0.199086746), (1.509414538, 0))
        make_face()
    extrude(amount=23.773536346, mode=Mode.SUBTRACT)


solid = part.part
